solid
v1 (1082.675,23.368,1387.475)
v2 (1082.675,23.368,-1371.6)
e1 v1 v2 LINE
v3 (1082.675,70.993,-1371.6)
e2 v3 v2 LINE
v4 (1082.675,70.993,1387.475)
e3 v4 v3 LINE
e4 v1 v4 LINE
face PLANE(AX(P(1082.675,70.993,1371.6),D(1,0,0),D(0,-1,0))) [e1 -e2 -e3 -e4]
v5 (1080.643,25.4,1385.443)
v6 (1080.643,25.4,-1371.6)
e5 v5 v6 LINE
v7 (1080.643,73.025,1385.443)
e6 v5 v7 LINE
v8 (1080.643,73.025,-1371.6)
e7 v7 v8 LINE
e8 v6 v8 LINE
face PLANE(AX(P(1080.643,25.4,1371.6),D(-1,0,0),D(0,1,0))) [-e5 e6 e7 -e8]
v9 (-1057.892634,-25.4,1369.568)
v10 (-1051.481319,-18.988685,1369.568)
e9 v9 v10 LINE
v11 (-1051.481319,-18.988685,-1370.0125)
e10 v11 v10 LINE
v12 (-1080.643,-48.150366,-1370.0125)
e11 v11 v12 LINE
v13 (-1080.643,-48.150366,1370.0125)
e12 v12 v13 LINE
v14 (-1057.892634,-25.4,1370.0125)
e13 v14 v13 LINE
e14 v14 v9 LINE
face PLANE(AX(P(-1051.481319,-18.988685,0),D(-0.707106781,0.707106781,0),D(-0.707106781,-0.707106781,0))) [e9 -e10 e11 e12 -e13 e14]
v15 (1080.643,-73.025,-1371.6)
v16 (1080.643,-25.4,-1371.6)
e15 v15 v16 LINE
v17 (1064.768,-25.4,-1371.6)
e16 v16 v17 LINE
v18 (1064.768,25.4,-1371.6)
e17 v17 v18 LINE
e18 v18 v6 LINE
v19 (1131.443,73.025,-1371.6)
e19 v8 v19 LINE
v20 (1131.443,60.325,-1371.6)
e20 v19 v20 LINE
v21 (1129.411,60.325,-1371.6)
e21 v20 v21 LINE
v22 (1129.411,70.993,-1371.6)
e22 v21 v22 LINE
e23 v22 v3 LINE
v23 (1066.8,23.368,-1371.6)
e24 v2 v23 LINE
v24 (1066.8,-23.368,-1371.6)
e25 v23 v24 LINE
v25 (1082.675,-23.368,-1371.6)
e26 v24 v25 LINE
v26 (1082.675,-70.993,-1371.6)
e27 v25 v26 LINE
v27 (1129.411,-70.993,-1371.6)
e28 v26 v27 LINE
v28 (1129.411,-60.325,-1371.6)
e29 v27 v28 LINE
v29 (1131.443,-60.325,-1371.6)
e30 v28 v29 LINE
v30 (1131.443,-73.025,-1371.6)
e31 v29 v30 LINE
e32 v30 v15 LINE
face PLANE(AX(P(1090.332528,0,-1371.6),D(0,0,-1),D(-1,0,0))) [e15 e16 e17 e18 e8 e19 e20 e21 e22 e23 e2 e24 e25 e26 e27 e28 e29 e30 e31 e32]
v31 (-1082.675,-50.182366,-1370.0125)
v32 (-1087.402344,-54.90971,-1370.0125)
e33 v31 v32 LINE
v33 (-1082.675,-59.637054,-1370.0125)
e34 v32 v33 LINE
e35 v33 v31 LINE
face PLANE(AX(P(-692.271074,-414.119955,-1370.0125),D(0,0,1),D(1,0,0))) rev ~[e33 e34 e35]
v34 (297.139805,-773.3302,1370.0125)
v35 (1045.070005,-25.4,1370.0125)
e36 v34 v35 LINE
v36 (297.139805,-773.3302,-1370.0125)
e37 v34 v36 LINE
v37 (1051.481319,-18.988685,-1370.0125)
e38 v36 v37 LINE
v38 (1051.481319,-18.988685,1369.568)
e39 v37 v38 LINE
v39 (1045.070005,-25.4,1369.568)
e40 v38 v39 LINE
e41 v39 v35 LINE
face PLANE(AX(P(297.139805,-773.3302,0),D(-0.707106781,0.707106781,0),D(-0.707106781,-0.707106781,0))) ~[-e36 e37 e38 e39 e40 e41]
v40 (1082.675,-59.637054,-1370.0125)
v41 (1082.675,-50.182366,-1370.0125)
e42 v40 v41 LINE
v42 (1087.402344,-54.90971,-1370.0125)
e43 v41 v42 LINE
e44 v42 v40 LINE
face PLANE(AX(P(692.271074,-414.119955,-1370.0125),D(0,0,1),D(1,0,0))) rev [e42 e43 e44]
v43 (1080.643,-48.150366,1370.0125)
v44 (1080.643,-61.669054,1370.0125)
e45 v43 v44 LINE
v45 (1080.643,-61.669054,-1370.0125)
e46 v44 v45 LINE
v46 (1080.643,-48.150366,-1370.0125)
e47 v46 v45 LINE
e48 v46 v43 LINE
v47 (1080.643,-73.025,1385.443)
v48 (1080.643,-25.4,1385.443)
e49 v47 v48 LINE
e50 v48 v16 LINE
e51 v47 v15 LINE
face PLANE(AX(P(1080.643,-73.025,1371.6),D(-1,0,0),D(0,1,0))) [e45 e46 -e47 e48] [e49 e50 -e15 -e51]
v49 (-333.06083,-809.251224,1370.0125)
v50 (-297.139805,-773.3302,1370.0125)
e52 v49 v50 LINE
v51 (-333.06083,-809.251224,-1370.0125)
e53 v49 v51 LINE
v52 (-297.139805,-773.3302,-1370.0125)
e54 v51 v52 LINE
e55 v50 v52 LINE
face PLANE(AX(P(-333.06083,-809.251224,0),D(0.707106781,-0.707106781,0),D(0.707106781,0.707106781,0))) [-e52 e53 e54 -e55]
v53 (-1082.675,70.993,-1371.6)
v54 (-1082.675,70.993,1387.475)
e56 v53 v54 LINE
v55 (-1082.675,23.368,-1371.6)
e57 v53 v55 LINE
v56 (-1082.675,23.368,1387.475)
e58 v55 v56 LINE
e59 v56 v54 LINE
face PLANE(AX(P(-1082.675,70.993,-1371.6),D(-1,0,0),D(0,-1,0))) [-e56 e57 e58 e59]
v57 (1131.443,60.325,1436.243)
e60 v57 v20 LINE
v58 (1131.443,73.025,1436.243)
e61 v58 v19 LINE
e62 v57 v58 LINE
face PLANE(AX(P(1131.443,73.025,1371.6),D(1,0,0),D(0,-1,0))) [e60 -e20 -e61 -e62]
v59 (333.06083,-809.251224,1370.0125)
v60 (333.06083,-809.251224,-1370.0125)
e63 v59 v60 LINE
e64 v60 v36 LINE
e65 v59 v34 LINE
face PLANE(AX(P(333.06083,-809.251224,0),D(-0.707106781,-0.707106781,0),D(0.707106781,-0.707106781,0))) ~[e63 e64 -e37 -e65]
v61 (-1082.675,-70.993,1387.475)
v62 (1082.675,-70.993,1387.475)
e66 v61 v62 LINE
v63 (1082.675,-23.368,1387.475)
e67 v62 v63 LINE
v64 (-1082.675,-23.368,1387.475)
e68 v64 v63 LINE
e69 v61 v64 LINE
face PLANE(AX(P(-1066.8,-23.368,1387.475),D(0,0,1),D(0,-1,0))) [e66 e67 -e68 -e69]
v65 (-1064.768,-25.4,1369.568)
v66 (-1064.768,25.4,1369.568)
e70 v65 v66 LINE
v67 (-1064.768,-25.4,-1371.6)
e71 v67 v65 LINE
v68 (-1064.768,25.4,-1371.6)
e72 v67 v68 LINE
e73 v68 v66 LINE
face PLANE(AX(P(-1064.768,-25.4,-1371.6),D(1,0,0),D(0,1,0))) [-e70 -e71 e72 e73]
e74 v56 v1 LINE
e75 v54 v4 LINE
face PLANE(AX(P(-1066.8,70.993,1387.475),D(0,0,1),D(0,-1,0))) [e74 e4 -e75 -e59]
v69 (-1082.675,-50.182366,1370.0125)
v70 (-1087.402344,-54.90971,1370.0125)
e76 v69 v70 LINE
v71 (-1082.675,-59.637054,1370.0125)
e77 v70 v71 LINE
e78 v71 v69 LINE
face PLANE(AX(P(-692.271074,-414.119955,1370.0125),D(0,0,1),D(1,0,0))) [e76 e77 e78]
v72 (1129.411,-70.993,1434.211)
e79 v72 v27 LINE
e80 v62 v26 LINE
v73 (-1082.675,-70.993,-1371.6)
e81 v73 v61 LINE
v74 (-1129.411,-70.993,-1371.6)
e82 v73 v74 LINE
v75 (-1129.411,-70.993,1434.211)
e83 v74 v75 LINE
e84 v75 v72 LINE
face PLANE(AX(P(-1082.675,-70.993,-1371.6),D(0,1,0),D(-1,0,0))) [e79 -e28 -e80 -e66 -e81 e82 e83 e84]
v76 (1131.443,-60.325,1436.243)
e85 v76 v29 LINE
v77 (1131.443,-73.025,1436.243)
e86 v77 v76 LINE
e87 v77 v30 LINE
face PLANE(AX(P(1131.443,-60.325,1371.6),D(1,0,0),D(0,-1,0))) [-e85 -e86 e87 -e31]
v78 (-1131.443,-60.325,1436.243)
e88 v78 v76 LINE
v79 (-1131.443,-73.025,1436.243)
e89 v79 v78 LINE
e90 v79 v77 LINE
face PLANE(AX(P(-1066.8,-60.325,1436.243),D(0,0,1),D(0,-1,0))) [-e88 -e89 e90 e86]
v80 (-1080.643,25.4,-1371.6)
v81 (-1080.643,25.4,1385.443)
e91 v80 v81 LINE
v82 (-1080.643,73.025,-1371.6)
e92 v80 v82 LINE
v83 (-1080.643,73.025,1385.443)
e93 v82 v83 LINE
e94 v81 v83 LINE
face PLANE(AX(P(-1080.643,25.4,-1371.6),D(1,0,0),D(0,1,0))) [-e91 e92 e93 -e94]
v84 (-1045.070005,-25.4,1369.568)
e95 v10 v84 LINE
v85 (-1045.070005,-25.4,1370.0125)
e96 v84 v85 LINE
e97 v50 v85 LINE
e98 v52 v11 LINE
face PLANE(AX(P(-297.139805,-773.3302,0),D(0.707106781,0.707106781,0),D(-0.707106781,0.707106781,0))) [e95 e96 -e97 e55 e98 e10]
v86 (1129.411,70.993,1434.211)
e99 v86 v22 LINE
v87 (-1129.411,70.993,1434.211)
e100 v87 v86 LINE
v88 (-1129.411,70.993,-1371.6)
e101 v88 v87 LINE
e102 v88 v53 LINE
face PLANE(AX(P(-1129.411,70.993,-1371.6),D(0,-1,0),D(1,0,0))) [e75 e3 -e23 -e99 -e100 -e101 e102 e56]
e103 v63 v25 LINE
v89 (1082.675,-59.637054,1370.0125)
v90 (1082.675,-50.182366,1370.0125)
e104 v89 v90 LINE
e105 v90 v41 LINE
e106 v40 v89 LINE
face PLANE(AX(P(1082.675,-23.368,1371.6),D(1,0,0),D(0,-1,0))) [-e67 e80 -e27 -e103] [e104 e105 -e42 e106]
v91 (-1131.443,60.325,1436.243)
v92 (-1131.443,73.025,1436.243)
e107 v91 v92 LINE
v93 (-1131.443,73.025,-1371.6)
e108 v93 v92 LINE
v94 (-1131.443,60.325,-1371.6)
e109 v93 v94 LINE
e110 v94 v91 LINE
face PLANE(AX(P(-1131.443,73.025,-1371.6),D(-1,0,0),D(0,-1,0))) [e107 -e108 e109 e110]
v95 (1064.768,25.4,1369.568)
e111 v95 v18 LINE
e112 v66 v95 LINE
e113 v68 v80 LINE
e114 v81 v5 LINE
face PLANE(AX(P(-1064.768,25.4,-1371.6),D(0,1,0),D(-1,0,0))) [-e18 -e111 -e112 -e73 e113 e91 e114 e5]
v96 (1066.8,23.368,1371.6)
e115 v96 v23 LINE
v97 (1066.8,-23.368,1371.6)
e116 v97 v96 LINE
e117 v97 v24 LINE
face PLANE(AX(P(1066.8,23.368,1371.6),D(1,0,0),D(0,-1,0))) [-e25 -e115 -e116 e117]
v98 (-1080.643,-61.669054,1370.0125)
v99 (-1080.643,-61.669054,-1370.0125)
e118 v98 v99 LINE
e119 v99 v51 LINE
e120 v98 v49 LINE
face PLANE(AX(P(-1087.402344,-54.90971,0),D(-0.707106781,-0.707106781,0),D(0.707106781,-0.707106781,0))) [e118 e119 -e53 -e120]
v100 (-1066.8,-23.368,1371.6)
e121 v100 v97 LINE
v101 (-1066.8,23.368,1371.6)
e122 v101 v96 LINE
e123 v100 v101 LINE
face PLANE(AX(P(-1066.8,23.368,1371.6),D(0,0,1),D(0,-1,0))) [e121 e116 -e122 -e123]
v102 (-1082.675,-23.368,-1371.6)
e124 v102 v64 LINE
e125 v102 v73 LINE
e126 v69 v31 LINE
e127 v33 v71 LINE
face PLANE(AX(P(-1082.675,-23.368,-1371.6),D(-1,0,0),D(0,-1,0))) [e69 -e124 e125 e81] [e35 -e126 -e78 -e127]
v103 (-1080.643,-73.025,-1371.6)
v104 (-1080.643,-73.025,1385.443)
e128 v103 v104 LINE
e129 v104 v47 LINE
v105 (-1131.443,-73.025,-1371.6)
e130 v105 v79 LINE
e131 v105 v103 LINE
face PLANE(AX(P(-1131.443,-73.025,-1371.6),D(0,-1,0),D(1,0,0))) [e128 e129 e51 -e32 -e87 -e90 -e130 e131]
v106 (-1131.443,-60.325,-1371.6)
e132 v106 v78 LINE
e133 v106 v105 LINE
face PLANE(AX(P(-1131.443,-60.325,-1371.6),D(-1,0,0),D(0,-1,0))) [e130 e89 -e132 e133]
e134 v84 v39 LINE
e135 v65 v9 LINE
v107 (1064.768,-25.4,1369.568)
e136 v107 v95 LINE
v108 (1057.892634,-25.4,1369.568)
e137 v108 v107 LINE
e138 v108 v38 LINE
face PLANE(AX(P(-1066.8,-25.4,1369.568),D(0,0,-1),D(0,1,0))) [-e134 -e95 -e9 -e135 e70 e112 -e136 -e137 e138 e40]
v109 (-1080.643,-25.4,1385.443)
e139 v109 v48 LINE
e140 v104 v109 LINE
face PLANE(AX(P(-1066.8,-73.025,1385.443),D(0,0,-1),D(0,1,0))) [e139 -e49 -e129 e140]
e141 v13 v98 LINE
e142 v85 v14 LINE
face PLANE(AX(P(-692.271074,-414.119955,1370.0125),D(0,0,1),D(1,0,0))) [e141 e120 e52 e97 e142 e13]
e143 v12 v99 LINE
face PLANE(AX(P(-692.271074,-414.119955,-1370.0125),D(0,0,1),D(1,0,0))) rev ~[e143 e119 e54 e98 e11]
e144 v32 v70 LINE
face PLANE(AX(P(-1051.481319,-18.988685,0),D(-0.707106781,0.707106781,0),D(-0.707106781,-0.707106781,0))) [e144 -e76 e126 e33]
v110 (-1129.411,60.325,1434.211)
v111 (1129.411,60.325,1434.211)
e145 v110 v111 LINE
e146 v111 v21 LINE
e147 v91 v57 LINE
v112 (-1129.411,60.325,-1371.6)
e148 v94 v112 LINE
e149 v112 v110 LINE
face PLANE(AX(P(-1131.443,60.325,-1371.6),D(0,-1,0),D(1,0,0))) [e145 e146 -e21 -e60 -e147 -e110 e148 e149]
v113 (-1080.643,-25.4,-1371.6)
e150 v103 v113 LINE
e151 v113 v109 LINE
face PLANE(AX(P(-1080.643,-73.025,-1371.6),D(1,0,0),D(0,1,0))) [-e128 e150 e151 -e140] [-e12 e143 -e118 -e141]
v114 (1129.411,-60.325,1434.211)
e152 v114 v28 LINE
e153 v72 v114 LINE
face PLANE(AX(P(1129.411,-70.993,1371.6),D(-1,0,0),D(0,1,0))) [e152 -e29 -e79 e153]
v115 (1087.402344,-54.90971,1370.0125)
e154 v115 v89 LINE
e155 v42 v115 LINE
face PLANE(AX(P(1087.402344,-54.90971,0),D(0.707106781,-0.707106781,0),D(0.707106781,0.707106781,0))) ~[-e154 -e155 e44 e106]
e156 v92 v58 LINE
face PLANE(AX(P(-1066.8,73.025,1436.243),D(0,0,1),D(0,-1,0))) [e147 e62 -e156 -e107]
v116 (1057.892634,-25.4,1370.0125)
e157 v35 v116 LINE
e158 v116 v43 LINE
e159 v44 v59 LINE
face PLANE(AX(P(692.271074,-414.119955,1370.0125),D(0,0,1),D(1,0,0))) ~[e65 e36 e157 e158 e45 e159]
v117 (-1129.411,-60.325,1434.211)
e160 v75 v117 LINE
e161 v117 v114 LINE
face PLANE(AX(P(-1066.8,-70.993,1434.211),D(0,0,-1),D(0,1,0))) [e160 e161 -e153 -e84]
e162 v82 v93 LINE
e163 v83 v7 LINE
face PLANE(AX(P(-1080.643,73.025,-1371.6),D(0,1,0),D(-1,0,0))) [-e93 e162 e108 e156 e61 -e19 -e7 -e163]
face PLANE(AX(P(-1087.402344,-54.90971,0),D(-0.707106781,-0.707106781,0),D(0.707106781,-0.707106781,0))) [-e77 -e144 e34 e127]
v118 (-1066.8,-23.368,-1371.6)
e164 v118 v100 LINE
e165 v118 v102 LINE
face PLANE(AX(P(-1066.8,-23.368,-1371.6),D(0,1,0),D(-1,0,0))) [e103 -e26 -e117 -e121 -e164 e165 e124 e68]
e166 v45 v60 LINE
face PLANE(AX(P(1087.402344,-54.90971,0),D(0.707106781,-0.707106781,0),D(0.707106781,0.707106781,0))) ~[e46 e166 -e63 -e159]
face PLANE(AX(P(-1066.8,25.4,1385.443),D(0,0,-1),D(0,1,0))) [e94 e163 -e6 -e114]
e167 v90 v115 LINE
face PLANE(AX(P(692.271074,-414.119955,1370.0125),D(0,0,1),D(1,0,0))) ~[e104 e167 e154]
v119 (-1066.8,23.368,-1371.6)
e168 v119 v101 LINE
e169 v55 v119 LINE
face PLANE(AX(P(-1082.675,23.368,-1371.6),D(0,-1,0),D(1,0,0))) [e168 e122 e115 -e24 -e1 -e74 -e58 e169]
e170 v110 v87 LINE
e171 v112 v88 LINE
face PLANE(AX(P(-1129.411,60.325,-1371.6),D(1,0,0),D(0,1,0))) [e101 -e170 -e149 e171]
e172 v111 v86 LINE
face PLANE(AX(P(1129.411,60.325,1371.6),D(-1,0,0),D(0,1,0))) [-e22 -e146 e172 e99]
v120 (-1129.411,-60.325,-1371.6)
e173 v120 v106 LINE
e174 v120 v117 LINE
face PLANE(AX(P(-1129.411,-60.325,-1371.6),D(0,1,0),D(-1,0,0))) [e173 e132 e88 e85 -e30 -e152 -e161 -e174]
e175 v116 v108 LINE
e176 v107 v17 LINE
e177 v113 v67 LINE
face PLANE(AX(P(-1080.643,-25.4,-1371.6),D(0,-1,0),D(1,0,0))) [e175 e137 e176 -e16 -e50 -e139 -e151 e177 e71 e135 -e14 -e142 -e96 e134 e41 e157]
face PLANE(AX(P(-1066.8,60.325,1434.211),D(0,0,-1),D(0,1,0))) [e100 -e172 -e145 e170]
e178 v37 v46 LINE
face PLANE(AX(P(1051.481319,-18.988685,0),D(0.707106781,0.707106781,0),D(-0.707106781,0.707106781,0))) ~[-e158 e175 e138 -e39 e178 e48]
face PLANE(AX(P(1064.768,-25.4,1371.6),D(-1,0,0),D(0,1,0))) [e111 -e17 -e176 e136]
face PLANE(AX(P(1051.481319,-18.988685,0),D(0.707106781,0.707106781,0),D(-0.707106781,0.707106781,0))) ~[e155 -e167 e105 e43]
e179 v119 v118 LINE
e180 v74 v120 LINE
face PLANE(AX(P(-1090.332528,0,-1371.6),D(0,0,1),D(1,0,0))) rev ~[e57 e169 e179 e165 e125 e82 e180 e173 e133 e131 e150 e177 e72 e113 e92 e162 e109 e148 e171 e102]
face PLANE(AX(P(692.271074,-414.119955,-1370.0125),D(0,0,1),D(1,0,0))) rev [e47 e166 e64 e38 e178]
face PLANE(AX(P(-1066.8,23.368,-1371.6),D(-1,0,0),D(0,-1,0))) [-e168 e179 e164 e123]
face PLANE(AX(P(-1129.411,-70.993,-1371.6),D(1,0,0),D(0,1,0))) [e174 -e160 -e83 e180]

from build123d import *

# Parameters (mm, degrees)
F5_DEPTH = 1370.0125


# Not quite as in the source:
# - a variable given as a bare number and used for a length is read in inches; the dataset says mm whatever the document's units were


with BuildPart() as f3:
    # F3: sweep along a path in F1
    with BuildLine(Plane.XZ) as f3_path:
        Line((-1066.8, -1371.6), (-1066.8, 1371.6))
        Line((-1066.8, 1371.6), (1066.8, 1371.6))
        Line((1066.8, 1371.6), (1066.8, -1371.6))
    # F2 (on Top) → F3 (sweep)
    with BuildSketch(Plane.XY):
        Polygon((-1082.675, 23.368), (-1066.8, 23.368), (-1066.8, -23.368), (-1082.675, -23.368), (-1082.675, -70.993), (-1129.411, -70.993), (-1129.411, -60.325), (-1131.443, -60.325), (-1131.443, -73.025), (-1080.643, -73.025), (-1080.643, -25.4), (-1064.768, -25.4), (-1064.768, 25.4), (-1080.643, 25.4), (-1080.643, 73.025), (-1131.443, 73.025), (-1131.443, 60.325), (-1129.411, 60.325), (-1129.411, 70.993), (-1082.675, 70.993), align=None)
    sweep(path=f3_path.line, transition=Transition.RIGHT)

    # F4 (on Top) → F5 (join, symmetric)
    with BuildSketch(Plane.XY):
        Polygon((-297.1398050959, -773.3301995265), (-1051.4813192657, -18.9886853567), (-1087.40234375, -54.909709841), (-333.0608295802, -809.2512240108), align=None)
    extrude(amount=F5_DEPTH, both=True)

    # F6: F3 across plane


with BuildPart() as f3_1:
    add(f3.part)
    add(f3.part.mirror(Plane.YZ))


solid = f3_1.part
